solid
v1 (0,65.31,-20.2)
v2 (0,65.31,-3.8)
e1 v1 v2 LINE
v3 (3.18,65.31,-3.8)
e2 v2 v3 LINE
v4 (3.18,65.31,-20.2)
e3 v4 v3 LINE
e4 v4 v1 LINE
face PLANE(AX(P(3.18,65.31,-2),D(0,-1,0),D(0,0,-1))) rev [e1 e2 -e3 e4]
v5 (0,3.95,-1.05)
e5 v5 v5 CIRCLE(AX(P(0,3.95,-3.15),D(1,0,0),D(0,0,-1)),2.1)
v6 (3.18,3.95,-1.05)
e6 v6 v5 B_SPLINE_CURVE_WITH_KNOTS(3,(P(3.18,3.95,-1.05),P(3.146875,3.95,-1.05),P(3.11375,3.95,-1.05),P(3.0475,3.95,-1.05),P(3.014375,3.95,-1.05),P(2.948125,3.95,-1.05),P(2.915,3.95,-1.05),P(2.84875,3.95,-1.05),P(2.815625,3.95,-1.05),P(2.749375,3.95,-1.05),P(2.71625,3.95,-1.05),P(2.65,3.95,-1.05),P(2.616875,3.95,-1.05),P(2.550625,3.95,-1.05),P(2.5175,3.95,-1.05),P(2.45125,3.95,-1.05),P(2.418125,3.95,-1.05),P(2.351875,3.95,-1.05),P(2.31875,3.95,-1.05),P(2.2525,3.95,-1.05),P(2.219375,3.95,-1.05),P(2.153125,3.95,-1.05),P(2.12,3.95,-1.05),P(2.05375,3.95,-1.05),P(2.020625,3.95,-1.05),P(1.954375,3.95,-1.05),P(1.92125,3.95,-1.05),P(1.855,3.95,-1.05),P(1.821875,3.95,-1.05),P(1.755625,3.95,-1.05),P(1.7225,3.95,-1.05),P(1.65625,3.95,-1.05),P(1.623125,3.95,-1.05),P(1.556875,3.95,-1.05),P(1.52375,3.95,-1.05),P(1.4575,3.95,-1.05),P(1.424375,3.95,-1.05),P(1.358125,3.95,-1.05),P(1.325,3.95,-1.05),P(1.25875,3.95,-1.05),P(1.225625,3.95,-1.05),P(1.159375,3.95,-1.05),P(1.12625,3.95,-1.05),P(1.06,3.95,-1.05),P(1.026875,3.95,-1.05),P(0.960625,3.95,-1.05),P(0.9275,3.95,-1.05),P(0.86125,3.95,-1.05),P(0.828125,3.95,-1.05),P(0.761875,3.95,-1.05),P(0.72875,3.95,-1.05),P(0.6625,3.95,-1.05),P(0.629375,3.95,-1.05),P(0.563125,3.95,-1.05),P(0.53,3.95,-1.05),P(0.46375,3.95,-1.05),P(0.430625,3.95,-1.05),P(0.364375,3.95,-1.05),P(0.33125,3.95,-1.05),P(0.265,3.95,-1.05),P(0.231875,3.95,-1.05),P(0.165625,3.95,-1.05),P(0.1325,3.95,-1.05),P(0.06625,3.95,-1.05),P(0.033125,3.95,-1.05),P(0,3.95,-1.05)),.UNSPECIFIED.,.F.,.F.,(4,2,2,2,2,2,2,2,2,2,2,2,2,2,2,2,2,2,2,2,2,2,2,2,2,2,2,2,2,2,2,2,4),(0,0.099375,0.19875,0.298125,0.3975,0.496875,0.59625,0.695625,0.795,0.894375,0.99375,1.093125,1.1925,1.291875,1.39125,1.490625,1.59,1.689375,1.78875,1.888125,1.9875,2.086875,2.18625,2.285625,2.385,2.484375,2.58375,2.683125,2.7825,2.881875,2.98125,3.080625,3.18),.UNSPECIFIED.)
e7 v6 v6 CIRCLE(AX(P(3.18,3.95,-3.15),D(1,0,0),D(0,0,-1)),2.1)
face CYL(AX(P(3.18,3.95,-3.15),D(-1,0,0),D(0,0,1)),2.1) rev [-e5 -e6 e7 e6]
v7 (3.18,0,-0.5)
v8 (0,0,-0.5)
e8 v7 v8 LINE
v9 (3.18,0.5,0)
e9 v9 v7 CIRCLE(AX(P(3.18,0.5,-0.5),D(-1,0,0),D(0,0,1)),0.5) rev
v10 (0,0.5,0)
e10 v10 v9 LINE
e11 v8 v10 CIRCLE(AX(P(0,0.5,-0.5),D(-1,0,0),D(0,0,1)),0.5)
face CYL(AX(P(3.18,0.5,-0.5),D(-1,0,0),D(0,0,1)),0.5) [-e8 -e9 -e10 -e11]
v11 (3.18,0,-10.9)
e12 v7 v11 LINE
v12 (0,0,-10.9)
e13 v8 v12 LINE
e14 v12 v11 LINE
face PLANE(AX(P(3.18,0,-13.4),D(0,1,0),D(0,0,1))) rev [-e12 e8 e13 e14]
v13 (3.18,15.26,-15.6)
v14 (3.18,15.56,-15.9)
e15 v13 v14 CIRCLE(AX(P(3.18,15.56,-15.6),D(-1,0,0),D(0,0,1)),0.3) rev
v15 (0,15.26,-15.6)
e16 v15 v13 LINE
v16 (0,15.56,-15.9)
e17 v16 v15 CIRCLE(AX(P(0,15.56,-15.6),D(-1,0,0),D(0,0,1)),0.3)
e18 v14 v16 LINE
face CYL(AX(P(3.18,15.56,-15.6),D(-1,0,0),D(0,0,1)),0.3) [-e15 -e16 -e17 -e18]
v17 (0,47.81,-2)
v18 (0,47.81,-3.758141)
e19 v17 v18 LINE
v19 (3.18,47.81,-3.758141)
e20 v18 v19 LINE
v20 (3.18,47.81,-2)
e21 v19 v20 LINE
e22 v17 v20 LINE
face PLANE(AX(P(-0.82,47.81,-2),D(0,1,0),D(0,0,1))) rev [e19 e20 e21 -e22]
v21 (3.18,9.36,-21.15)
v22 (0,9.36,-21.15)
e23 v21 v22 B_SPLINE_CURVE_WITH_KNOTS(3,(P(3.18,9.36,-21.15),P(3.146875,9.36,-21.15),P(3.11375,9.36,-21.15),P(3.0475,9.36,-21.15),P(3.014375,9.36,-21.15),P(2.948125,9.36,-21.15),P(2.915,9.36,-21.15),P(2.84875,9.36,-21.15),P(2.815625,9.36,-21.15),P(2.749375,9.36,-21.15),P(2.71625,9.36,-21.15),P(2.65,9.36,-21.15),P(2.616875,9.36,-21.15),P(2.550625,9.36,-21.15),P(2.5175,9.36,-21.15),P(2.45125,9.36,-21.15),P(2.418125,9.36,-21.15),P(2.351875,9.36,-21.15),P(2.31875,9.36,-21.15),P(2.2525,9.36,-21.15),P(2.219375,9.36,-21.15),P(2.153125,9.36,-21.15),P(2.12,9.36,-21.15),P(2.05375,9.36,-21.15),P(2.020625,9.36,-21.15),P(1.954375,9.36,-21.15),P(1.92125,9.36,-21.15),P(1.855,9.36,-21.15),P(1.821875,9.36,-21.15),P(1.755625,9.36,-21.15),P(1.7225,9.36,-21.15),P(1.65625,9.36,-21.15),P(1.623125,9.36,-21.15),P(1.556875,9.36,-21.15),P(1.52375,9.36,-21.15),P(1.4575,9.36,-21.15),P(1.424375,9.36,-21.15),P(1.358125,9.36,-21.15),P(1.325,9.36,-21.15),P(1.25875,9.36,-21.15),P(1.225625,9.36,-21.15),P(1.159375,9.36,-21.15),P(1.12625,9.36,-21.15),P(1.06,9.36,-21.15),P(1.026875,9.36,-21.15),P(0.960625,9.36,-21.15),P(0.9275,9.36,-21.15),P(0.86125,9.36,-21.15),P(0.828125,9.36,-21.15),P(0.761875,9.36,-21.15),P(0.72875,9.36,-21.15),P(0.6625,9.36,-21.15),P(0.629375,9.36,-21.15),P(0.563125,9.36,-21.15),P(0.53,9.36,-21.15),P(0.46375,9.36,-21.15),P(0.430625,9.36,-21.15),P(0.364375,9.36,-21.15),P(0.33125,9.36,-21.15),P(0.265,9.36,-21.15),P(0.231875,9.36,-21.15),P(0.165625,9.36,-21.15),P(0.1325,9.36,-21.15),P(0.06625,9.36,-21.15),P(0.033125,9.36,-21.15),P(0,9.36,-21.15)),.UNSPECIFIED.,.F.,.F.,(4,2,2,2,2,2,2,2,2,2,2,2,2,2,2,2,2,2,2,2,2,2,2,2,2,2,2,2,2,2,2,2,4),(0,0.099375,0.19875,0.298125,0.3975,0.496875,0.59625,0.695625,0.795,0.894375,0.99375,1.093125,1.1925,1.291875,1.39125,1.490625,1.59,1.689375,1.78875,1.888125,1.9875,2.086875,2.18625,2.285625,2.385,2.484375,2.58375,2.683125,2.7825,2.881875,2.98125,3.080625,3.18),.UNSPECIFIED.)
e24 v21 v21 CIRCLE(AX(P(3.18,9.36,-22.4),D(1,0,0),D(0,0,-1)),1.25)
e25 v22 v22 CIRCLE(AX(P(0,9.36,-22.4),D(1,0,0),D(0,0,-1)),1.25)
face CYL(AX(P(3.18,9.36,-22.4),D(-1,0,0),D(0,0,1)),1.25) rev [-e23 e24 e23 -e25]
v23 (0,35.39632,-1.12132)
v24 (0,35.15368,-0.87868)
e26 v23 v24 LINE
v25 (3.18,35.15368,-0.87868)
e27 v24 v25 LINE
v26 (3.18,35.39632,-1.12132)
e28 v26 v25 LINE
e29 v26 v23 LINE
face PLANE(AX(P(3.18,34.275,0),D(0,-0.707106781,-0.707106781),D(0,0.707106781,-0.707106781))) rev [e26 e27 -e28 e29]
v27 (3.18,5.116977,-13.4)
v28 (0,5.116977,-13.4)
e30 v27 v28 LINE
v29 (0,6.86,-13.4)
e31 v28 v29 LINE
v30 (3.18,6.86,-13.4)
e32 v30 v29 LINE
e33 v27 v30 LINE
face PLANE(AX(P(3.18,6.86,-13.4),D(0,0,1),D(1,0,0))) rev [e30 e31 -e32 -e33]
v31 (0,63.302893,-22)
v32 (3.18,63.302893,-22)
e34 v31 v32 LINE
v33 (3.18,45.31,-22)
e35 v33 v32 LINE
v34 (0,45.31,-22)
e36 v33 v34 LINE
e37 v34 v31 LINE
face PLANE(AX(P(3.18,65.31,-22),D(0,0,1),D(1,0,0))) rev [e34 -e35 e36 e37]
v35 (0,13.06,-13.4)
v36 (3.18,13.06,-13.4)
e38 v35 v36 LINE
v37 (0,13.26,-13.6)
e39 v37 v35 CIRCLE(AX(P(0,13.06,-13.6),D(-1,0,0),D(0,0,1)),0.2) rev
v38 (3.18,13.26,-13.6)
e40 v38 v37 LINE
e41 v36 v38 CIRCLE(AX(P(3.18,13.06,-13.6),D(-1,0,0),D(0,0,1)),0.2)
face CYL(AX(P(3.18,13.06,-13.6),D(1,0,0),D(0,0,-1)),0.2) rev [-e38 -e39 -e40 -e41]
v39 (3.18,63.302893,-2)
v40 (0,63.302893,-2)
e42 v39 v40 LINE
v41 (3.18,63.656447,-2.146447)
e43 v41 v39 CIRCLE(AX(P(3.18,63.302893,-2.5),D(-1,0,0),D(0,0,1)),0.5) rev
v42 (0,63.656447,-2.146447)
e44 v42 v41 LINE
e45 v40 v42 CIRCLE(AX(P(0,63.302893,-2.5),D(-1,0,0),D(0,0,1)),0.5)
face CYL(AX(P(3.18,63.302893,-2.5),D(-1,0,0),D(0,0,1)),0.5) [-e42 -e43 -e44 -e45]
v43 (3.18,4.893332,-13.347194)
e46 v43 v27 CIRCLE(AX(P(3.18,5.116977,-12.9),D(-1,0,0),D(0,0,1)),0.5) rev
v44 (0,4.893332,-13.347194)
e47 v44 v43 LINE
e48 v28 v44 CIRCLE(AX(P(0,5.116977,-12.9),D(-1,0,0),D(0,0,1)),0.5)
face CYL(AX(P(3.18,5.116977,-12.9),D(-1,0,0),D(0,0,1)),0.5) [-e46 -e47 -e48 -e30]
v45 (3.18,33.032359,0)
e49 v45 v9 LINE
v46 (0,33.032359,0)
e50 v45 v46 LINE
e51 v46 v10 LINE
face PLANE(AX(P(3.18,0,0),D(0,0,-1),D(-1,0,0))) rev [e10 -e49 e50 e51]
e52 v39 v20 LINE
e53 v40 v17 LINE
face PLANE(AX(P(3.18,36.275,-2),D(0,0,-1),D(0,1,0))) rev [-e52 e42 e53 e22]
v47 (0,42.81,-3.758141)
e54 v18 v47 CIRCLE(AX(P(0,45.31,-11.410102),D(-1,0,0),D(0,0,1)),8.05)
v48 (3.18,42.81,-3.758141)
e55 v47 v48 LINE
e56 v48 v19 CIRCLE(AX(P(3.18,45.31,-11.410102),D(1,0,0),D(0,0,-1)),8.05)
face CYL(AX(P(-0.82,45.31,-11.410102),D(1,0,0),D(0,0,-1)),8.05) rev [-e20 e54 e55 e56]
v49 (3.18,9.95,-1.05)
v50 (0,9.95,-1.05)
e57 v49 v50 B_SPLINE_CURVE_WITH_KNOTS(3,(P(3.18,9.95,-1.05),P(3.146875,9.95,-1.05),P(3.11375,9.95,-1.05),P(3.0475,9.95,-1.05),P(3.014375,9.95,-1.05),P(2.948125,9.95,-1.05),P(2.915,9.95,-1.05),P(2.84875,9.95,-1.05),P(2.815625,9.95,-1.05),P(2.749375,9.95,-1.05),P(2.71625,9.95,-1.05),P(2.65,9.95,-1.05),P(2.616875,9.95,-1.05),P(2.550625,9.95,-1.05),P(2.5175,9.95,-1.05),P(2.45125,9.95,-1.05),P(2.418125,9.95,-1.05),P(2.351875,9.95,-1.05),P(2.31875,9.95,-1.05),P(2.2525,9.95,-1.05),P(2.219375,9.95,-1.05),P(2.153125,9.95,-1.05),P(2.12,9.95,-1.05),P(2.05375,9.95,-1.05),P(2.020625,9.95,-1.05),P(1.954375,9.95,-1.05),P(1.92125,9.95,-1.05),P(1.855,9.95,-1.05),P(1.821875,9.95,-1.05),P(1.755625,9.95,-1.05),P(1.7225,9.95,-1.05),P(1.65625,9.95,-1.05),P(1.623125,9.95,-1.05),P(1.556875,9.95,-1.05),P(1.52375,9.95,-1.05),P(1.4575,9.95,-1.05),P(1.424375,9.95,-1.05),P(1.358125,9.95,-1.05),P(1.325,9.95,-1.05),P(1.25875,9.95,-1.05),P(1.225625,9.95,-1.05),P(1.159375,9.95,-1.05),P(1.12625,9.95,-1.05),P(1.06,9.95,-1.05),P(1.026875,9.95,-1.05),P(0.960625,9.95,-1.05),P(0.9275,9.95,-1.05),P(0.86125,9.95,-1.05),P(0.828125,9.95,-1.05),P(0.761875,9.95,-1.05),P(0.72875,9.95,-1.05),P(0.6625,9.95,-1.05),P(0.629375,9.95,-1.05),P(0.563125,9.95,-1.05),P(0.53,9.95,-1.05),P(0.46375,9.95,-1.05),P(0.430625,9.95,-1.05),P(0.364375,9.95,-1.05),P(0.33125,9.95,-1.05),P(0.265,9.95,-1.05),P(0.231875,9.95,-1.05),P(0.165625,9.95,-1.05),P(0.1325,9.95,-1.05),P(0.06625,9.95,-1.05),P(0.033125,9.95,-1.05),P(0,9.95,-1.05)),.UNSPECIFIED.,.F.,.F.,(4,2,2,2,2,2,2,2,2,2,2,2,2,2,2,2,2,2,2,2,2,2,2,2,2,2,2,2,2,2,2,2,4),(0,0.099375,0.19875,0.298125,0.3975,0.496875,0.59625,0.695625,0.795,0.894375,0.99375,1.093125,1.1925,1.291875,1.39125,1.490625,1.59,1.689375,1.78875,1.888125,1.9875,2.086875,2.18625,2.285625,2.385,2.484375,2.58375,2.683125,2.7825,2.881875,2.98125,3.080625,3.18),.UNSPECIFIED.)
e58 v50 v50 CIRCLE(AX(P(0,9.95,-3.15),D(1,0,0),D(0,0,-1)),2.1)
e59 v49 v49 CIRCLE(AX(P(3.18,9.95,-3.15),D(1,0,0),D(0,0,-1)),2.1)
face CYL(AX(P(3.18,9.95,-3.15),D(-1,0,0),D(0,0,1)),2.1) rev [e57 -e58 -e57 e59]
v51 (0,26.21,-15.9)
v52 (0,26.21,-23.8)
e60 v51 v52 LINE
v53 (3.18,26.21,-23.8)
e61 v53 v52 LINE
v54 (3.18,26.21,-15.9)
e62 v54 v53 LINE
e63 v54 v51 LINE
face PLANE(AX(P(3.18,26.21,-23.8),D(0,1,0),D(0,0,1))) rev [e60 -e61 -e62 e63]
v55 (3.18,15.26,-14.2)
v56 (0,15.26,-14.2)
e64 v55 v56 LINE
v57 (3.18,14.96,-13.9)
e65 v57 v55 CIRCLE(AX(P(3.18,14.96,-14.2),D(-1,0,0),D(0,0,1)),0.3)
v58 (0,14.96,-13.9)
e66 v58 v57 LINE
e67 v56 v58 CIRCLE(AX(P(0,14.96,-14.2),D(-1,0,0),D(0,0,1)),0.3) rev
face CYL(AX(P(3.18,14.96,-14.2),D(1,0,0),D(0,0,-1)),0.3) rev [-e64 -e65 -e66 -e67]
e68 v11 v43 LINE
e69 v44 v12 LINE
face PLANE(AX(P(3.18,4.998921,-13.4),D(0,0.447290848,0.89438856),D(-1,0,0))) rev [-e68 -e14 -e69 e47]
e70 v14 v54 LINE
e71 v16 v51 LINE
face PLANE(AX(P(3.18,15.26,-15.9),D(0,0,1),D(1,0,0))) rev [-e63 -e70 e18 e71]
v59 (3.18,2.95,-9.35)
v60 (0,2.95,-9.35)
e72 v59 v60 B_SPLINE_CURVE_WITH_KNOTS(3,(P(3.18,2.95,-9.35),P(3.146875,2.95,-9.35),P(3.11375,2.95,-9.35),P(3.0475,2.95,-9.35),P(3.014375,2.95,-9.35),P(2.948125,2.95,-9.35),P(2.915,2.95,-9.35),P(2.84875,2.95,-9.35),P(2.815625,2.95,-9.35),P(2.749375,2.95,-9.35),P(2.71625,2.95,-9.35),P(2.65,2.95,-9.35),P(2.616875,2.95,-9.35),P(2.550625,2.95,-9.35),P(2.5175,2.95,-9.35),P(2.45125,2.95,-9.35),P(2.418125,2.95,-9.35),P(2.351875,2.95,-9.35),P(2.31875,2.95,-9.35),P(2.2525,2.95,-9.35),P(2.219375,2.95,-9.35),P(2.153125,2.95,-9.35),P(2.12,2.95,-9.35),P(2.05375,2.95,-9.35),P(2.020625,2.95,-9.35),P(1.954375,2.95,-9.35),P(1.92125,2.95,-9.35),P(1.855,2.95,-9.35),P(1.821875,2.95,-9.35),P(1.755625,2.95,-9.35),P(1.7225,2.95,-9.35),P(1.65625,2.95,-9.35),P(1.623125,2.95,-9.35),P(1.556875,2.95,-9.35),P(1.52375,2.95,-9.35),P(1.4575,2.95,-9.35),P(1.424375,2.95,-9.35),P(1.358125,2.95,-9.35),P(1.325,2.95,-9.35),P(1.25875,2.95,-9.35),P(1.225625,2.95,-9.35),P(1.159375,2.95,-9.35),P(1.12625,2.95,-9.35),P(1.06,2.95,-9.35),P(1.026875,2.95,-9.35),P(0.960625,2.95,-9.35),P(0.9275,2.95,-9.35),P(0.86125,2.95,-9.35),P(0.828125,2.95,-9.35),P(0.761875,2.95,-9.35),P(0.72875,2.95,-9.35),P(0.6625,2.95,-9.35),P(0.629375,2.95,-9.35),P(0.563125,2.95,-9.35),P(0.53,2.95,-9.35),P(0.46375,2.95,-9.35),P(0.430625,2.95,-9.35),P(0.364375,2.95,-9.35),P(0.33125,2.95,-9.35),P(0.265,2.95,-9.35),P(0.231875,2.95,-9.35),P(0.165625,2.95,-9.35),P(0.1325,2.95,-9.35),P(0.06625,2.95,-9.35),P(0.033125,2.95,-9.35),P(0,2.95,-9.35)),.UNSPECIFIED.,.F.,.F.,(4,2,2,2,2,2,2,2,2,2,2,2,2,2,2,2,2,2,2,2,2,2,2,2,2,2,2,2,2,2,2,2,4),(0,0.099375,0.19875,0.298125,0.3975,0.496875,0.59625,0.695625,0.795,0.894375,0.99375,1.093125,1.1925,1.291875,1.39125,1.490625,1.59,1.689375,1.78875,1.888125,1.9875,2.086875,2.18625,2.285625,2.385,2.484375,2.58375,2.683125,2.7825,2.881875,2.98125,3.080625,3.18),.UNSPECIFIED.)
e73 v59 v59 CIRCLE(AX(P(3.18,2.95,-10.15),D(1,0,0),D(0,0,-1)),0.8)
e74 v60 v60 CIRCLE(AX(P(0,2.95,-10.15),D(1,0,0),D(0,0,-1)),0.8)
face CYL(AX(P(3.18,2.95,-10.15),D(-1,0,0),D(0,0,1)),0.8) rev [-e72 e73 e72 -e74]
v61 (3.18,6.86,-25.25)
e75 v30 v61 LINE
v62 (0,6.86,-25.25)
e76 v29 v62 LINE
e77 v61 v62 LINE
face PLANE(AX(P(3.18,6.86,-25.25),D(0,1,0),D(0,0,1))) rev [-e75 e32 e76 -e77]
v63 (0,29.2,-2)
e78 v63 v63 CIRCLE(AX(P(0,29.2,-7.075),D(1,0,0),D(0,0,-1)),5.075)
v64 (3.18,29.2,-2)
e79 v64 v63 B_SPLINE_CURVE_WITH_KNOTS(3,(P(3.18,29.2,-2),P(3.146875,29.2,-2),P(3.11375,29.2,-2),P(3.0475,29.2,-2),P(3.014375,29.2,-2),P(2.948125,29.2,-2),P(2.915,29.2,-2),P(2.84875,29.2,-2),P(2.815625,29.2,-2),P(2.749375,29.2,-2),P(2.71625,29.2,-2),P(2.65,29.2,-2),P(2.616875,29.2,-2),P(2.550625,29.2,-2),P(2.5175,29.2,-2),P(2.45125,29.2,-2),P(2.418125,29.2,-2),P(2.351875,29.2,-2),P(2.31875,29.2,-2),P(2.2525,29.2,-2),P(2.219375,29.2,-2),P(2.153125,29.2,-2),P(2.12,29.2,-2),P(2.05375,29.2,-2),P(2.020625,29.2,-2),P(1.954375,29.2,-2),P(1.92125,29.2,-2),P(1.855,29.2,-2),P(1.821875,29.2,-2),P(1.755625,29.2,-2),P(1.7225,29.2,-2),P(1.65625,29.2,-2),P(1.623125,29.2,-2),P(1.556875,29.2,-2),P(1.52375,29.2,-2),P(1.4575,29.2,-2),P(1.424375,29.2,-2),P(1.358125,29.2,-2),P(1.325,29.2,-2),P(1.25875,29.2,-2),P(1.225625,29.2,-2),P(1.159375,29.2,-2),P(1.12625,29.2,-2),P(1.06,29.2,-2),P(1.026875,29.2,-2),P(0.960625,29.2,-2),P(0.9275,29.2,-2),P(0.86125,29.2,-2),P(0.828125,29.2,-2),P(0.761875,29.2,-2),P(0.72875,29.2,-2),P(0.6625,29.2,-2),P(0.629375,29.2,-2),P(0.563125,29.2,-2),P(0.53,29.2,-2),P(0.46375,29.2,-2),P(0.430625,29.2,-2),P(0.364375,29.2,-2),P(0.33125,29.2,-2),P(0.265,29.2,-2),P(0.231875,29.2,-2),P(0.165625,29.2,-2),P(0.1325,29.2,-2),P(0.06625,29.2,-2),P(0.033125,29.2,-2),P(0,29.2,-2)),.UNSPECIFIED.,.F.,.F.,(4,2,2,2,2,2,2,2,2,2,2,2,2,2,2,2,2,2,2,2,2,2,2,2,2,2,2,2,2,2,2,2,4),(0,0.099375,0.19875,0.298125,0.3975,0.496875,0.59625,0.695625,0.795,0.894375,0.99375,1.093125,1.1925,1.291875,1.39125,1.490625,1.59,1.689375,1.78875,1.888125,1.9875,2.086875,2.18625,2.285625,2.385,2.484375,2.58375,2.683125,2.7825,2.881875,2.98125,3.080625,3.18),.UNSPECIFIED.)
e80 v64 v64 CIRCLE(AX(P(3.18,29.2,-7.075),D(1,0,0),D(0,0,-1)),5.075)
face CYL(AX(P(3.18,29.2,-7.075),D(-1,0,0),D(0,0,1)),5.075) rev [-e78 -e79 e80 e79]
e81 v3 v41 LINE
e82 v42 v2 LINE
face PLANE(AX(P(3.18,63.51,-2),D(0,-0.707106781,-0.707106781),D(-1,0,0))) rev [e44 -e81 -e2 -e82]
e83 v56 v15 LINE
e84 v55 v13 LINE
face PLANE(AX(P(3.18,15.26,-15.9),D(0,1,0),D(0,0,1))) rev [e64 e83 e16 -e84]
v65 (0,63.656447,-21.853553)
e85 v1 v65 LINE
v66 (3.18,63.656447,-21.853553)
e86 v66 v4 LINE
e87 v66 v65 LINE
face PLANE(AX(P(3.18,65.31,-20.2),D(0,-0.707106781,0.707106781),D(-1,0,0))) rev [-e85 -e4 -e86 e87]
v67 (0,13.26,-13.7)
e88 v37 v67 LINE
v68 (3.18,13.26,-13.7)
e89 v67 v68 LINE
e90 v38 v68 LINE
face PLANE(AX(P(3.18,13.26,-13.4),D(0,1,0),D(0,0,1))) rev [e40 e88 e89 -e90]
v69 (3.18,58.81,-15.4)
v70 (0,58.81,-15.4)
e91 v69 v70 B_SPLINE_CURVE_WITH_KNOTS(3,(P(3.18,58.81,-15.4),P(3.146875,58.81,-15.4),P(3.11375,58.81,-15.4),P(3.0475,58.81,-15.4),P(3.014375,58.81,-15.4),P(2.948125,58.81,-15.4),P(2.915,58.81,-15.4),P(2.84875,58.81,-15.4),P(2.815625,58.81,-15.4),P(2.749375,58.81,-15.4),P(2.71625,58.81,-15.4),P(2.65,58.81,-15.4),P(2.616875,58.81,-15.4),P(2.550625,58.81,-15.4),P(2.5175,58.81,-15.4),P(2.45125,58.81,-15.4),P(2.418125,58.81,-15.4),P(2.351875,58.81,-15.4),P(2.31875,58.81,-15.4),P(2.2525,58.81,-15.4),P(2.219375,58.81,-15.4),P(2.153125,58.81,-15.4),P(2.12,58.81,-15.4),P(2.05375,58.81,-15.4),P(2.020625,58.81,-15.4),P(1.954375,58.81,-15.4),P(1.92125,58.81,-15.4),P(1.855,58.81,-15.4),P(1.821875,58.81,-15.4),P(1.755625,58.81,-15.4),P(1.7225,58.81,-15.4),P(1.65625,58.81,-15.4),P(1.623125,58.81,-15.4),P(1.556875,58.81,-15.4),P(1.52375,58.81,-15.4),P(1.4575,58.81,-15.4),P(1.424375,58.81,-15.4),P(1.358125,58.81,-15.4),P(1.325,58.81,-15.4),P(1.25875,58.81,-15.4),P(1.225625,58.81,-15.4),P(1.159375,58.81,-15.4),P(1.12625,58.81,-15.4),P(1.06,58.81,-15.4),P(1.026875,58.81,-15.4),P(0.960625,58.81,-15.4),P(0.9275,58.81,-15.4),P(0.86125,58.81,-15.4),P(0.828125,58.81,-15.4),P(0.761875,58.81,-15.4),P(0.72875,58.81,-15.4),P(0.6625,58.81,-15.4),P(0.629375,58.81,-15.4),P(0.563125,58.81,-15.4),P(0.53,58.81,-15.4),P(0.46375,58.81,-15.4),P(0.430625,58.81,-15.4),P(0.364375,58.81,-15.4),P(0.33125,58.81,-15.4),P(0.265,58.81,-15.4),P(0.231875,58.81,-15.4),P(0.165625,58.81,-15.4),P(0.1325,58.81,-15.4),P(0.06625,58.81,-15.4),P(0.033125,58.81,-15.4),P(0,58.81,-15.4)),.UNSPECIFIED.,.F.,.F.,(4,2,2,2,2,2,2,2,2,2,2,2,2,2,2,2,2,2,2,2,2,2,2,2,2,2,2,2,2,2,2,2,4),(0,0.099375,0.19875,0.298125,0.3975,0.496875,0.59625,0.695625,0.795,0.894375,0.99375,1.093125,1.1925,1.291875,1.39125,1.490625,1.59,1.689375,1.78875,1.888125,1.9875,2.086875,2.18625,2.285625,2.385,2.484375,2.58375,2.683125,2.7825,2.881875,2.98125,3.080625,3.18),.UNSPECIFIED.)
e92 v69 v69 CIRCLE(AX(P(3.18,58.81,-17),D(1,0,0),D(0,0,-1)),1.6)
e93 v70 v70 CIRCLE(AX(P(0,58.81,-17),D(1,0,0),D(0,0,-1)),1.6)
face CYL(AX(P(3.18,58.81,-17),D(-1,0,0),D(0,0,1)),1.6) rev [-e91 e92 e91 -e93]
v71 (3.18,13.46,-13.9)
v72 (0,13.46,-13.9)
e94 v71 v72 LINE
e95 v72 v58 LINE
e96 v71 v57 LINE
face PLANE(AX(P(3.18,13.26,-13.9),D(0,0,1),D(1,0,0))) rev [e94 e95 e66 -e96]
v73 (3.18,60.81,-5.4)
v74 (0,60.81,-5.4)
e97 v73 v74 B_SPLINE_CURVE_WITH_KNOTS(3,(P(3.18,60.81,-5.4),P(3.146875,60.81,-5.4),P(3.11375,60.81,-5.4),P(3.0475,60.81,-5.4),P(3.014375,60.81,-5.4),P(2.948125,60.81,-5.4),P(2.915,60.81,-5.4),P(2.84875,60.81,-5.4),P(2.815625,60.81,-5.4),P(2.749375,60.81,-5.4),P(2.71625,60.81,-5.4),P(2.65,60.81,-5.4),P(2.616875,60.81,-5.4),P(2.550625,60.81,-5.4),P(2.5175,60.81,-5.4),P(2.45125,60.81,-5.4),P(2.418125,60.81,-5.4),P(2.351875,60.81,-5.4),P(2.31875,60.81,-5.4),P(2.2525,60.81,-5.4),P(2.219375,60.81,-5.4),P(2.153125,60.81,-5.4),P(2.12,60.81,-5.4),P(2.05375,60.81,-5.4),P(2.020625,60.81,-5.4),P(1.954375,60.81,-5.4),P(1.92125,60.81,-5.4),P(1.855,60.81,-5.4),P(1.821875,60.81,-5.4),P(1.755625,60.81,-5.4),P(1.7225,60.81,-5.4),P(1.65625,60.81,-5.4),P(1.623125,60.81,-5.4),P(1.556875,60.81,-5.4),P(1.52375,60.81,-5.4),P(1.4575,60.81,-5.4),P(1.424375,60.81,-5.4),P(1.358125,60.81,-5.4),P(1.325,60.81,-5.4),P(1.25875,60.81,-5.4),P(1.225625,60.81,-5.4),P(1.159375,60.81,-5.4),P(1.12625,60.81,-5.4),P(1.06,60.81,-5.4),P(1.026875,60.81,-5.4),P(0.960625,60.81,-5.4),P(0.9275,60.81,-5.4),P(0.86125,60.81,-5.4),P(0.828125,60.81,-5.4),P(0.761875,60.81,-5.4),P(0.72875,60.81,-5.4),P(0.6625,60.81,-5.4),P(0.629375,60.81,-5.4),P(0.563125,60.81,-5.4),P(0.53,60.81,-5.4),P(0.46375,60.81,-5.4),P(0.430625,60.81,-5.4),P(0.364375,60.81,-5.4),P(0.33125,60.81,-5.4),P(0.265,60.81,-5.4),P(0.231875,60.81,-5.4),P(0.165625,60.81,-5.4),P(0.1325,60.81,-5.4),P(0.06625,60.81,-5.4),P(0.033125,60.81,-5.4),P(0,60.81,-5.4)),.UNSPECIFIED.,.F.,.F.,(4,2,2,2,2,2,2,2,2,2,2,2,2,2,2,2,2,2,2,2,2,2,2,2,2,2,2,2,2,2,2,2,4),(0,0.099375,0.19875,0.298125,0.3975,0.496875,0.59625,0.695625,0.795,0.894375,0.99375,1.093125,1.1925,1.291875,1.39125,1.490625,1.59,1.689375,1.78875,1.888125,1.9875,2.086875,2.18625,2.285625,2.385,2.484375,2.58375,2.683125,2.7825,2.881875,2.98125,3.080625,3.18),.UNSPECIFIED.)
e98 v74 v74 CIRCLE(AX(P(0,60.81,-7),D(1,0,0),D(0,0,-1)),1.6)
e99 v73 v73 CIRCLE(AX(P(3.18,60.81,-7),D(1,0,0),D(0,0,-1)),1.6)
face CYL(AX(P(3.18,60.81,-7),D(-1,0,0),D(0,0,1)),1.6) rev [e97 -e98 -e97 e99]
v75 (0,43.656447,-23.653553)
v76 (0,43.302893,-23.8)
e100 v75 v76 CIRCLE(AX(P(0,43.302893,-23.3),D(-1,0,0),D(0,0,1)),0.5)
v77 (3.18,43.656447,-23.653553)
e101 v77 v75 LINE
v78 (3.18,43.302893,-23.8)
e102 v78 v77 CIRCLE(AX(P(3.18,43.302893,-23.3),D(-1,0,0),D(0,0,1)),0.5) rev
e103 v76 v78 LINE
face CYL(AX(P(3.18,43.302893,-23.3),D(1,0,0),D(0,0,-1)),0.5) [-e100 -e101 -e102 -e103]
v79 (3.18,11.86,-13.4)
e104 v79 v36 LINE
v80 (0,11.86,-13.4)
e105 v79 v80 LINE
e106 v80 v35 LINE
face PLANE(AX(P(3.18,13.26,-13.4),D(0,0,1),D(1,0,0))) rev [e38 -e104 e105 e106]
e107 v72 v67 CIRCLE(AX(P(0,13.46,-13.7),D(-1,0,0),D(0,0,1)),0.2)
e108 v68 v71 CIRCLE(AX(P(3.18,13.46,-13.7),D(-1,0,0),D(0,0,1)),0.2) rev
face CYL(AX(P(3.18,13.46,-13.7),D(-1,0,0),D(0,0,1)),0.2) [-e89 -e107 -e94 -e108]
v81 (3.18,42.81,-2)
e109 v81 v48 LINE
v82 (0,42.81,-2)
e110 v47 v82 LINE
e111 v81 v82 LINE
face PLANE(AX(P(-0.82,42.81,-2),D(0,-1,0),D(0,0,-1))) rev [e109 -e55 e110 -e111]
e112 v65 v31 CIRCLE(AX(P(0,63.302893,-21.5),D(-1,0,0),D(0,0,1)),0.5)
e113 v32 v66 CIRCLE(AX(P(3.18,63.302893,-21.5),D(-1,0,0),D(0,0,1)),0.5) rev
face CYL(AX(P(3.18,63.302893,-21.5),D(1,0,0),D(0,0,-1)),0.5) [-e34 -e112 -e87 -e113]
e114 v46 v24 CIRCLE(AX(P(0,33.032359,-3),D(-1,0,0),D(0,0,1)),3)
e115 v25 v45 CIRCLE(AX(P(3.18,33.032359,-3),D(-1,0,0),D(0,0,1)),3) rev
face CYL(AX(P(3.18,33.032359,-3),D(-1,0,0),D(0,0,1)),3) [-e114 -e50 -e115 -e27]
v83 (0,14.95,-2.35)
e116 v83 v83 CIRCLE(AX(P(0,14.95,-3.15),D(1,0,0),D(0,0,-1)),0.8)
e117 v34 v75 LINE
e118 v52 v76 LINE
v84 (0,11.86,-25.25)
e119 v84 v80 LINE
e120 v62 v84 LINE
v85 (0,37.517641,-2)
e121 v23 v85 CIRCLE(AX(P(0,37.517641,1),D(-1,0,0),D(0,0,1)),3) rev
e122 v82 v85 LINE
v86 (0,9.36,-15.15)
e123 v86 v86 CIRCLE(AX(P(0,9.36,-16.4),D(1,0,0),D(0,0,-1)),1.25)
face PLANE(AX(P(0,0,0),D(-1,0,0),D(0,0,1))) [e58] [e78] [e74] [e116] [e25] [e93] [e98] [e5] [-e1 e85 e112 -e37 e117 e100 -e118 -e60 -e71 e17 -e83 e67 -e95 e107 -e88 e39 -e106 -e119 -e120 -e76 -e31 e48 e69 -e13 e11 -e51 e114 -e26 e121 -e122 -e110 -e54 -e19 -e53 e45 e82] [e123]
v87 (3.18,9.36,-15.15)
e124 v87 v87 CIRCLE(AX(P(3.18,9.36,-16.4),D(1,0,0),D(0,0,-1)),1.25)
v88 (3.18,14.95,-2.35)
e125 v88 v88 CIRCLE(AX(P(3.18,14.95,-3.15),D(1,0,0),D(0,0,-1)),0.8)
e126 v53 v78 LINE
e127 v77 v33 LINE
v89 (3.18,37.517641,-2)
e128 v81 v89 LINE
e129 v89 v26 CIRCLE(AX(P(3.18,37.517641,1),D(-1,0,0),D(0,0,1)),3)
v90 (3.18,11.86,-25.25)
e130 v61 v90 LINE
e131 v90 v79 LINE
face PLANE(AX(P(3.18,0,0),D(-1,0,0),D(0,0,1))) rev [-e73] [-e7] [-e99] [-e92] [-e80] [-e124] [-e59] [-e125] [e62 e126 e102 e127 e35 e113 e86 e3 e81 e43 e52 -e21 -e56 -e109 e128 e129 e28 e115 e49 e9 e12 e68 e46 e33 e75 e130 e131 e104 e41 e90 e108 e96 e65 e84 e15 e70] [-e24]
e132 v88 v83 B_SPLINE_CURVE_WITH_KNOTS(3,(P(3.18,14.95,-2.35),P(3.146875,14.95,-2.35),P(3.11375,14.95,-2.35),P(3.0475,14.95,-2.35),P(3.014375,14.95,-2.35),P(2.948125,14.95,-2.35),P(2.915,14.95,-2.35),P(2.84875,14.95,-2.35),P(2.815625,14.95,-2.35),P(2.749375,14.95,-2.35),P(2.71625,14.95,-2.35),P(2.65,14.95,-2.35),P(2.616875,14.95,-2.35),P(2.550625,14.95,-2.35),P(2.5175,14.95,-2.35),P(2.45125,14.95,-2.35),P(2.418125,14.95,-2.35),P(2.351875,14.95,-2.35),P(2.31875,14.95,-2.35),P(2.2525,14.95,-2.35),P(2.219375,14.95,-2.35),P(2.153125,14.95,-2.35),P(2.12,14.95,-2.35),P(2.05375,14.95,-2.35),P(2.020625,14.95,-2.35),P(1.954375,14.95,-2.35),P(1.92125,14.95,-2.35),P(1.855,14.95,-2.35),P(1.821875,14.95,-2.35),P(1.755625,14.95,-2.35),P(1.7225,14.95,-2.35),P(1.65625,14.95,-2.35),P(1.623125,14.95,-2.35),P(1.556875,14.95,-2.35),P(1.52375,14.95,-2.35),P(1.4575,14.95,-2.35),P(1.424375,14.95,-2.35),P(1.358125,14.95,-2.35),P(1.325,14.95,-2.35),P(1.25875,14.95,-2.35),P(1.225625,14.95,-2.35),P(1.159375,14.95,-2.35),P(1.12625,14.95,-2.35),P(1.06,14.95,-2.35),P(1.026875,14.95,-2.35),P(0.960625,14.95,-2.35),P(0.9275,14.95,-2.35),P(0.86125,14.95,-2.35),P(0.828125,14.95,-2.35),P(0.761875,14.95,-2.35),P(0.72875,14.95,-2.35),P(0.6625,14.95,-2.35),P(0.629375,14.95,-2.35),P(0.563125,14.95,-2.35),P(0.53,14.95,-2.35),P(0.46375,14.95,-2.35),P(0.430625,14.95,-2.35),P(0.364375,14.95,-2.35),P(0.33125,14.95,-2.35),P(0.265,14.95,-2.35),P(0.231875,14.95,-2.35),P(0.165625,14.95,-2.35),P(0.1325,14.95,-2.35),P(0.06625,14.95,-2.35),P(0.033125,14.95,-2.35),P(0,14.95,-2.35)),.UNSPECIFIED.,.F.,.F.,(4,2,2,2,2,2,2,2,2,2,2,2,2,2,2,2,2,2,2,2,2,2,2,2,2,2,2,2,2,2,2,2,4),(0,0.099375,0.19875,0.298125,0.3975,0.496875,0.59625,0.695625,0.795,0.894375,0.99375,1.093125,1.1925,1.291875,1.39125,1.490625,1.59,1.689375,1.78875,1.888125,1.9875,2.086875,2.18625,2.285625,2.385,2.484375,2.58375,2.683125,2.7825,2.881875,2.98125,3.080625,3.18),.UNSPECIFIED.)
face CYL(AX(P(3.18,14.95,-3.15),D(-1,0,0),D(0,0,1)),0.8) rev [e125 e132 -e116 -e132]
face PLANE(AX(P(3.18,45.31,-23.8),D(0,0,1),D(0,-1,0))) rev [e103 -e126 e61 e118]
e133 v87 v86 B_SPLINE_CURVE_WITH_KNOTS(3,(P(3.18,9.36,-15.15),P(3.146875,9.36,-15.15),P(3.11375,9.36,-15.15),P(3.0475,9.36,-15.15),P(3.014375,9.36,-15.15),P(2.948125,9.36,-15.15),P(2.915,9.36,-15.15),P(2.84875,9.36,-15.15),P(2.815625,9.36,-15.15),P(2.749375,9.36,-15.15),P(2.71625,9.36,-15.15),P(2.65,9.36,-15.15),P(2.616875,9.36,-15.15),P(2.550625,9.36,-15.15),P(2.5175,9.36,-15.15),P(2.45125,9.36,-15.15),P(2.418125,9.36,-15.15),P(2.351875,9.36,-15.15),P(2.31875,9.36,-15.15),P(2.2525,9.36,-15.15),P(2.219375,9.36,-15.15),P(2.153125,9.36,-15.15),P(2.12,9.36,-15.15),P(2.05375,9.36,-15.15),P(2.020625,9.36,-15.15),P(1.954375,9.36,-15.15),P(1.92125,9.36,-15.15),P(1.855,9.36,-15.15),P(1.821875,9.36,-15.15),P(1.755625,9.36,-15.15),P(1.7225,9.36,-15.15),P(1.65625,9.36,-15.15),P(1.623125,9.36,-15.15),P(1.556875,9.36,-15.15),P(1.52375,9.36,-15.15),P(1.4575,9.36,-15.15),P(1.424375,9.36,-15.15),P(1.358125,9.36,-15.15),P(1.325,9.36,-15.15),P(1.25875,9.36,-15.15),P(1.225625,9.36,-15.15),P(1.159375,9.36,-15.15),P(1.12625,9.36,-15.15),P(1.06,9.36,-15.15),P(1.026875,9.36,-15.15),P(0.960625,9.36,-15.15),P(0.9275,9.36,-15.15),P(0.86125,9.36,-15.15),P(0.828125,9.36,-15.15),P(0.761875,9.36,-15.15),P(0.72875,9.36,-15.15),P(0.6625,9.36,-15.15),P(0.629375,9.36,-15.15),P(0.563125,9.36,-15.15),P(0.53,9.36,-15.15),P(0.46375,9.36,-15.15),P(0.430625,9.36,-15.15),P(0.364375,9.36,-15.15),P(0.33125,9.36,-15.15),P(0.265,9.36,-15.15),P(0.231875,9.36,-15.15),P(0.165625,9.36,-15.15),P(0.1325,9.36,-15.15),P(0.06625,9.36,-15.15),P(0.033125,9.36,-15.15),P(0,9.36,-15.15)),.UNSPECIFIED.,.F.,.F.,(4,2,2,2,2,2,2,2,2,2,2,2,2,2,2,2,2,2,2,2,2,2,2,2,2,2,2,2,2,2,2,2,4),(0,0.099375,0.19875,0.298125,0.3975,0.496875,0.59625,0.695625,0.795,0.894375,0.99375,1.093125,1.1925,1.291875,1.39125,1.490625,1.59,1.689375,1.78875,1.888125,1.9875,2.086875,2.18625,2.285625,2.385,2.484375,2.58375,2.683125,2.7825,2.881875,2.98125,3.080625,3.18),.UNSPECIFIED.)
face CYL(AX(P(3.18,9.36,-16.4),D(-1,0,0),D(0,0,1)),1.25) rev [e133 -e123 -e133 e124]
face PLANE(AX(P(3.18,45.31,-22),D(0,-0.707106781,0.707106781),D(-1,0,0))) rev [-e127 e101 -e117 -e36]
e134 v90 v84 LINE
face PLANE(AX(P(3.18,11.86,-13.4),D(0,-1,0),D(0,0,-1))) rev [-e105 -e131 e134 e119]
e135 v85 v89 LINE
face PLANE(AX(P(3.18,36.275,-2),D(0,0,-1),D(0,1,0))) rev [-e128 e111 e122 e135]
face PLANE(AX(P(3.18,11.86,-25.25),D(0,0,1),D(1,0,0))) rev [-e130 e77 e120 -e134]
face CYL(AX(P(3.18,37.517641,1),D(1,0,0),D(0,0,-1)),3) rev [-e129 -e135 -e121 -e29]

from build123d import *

# Parameters (mm, degrees)
SKETCH1_R             = 5.075
SKETCH1_R_2           = 1.6
SKETCH1_R_3           = 1.25
SKETCH1_R_4           = 2.1
SKETCH1_R_5           = 0.8
BOSS_EXTRUDE1_DEPTH   = 3.18
CHAMFER1_SIZE         = 2.5
CHAMFER1_SIZE2        = 4.998920521
FILLET2_R             = 3
CHAMFER2_SIZE         = 1.8
FILLET4_R             = 0.5
FILLET7_R             = 0.2
M3X0_5_TAPPED_HOLE1_D = 2.5
M2_TAPPED_HOLE1_D     = 1.6
FILLET8_R             = 0.3
CUT_EXTRUDE5_DEPTH    = 4


with BuildPart() as part:
    # Sketch1 → Boss-Extrude1 (new body)
    with BuildSketch(Plane(origin=(0, 0, 0), x_dir=(0, 0, -1), z_dir=(1, 0, 0))):
        Polygon((0, 0), (0, 34.275), (2, 36.275), (2, 65.31), (22, 65.31), (22, 45.31), (23.8, 45.31), (23.8, 26.21), (15.9, 26.21), (15.9, 15.26), (13.9, 15.26), (13.9, 13.26), (13.4, 13.26), (13.4, 11.86), (25.25, 11.86), (25.25, 6.86), (13.4, 6.86), (13.4, 0), align=None)
        with Locations(Location((7.075, 29.2, 0), (0, 0, 180))):
            Circle(SKETCH1_R, mode=Mode.SUBTRACT)
        with Locations(Location((7, 60.81, 0), (0, 0, 180))):
            Circle(SKETCH1_R_2, mode=Mode.SUBTRACT)
        with Locations(Location((17, 58.81, 0), (0, 0, 180))):
            Circle(SKETCH1_R_2, mode=Mode.SUBTRACT)
        with Locations(Location((22.4, 9.36, 0), (0, 0, 180))):
            Circle(SKETCH1_R_3, mode=Mode.SUBTRACT)
        with Locations(Location((16.4, 9.36, 0), (0, 0, 180))):
            Circle(SKETCH1_R_3, mode=Mode.SUBTRACT)
        with Locations(Location((3.15, 3.95, 0), (0, 0, 180))):
            Circle(SKETCH1_R_4, mode=Mode.SUBTRACT)
        with Locations(Location((3.15, 9.95, 0), (0, 0, 180))):
            Circle(SKETCH1_R_4, mode=Mode.SUBTRACT)
        with Locations(Location((10.15, 2.95, 0), (0, 0, 180))):
            Circle(SKETCH1_R_5, mode=Mode.SUBTRACT)
        with Locations(Location((3.15, 14.95, 0), (0, 0, 180))):
            Circle(SKETCH1_R_5, mode=Mode.SUBTRACT)
    extrude(amount=BOSS_EXTRUDE1_DEPTH)

    # Chamfer1
    chamfer1_edges = [part.edges().sort_by_distance(p)[0] for p in [
        (1.59, 0, -13.4),
    ]]
    chamfer1_side = [part.faces().sort_by_distance(p)[0] for p in [
        (1.59, 0, -6.7),
    ]]
    chamfer(chamfer1_edges, length=CHAMFER1_SIZE, length2=CHAMFER1_SIZE2, reference=chamfer1_side[0])

    # Fillet2
    fillet2_edges = [part.edges().sort_by_distance(p)[0] for p in [
        (1.59, 34.275, 0),
        (1.59, 36.275, -2),
    ]]
    fillet(fillet2_edges, radius=FILLET2_R)

    # Chamfer2
    chamfer2_edges = [part.edges().sort_by_distance(p)[0] for p in [
        (1.59, 65.31, -22),
        (1.59, 65.31, -2),
        (1.59, 45.31, -23.8),
    ]]
    chamfer(chamfer2_edges, length=CHAMFER2_SIZE - 0.0001)  # a hair under: the kernel refuses the full size

    # Fillet4
    fillet4_edges = [part.edges().sort_by_distance(p)[0] for p in [
        (1.59, 43.5101, -23.8),
        (1.59, 63.5101, -22),
        (1.59, 63.5101, -2),
        (1.59, 0, 0),
        (1.59, 4.998920521, -13.4),
    ]]
    fillet(fillet4_edges, radius=FILLET4_R)

    # Fillet7
    fillet7_edges = [part.edges().sort_by_distance(p)[0] for p in [
        (1.59, 13.26, -13.9),
        (1.59, 13.26, -13.4),
    ]]
    fillet(fillet7_edges, radius=FILLET7_R)

    # M3x0.5 Tapped Hole1 (through all)
    with Locations(Plane(origin=(3.18, 0, 0), x_dir=(0, 0, -1), z_dir=(1, 0, 0))):
        with Locations((16.4, 9.36), (22.4, 9.36)):
            Hole(M3X0_5_TAPPED_HOLE1_D / 2)

    # M2 Tapped Hole1 (through all)
    with Locations(Plane(origin=(0, 14.95, -3.15), x_dir=(0, 0, -1), z_dir=(-1, 0, 0))):
        with Locations((0, 0), (7, 12)):
            Hole(M2_TAPPED_HOLE1_D / 2)

    # Fillet8
    fillet8_edges = [part.edges().sort_by_distance(p)[0] for p in [
        (1.59, 15.26, -15.9),
        (1.59, 15.26, -13.9),
    ]]
    fillet(fillet8_edges, radius=FILLET8_R)

    # Sketch13 → Cut-Extrude5 (cut)
    with BuildSketch(Plane(origin=(3.18, 0, 0), x_dir=(0, 0, -1), z_dir=(1, 0, 0))):
        with BuildLine():
            Line((2, 42.81), (3.758141467, 42.81))
            ThreePointArc((3.758141467, 42.81), (19.460102, 45.31), (3.758141467, 47.81))
            Line((3.758141467, 47.81), (2, 47.81))
            Line((2, 47.81), (2, 42.81))
        make_face()
    extrude(amount=-CUT_EXTRUDE5_DEPTH, mode=Mode.SUBTRACT)


solid = part.part
